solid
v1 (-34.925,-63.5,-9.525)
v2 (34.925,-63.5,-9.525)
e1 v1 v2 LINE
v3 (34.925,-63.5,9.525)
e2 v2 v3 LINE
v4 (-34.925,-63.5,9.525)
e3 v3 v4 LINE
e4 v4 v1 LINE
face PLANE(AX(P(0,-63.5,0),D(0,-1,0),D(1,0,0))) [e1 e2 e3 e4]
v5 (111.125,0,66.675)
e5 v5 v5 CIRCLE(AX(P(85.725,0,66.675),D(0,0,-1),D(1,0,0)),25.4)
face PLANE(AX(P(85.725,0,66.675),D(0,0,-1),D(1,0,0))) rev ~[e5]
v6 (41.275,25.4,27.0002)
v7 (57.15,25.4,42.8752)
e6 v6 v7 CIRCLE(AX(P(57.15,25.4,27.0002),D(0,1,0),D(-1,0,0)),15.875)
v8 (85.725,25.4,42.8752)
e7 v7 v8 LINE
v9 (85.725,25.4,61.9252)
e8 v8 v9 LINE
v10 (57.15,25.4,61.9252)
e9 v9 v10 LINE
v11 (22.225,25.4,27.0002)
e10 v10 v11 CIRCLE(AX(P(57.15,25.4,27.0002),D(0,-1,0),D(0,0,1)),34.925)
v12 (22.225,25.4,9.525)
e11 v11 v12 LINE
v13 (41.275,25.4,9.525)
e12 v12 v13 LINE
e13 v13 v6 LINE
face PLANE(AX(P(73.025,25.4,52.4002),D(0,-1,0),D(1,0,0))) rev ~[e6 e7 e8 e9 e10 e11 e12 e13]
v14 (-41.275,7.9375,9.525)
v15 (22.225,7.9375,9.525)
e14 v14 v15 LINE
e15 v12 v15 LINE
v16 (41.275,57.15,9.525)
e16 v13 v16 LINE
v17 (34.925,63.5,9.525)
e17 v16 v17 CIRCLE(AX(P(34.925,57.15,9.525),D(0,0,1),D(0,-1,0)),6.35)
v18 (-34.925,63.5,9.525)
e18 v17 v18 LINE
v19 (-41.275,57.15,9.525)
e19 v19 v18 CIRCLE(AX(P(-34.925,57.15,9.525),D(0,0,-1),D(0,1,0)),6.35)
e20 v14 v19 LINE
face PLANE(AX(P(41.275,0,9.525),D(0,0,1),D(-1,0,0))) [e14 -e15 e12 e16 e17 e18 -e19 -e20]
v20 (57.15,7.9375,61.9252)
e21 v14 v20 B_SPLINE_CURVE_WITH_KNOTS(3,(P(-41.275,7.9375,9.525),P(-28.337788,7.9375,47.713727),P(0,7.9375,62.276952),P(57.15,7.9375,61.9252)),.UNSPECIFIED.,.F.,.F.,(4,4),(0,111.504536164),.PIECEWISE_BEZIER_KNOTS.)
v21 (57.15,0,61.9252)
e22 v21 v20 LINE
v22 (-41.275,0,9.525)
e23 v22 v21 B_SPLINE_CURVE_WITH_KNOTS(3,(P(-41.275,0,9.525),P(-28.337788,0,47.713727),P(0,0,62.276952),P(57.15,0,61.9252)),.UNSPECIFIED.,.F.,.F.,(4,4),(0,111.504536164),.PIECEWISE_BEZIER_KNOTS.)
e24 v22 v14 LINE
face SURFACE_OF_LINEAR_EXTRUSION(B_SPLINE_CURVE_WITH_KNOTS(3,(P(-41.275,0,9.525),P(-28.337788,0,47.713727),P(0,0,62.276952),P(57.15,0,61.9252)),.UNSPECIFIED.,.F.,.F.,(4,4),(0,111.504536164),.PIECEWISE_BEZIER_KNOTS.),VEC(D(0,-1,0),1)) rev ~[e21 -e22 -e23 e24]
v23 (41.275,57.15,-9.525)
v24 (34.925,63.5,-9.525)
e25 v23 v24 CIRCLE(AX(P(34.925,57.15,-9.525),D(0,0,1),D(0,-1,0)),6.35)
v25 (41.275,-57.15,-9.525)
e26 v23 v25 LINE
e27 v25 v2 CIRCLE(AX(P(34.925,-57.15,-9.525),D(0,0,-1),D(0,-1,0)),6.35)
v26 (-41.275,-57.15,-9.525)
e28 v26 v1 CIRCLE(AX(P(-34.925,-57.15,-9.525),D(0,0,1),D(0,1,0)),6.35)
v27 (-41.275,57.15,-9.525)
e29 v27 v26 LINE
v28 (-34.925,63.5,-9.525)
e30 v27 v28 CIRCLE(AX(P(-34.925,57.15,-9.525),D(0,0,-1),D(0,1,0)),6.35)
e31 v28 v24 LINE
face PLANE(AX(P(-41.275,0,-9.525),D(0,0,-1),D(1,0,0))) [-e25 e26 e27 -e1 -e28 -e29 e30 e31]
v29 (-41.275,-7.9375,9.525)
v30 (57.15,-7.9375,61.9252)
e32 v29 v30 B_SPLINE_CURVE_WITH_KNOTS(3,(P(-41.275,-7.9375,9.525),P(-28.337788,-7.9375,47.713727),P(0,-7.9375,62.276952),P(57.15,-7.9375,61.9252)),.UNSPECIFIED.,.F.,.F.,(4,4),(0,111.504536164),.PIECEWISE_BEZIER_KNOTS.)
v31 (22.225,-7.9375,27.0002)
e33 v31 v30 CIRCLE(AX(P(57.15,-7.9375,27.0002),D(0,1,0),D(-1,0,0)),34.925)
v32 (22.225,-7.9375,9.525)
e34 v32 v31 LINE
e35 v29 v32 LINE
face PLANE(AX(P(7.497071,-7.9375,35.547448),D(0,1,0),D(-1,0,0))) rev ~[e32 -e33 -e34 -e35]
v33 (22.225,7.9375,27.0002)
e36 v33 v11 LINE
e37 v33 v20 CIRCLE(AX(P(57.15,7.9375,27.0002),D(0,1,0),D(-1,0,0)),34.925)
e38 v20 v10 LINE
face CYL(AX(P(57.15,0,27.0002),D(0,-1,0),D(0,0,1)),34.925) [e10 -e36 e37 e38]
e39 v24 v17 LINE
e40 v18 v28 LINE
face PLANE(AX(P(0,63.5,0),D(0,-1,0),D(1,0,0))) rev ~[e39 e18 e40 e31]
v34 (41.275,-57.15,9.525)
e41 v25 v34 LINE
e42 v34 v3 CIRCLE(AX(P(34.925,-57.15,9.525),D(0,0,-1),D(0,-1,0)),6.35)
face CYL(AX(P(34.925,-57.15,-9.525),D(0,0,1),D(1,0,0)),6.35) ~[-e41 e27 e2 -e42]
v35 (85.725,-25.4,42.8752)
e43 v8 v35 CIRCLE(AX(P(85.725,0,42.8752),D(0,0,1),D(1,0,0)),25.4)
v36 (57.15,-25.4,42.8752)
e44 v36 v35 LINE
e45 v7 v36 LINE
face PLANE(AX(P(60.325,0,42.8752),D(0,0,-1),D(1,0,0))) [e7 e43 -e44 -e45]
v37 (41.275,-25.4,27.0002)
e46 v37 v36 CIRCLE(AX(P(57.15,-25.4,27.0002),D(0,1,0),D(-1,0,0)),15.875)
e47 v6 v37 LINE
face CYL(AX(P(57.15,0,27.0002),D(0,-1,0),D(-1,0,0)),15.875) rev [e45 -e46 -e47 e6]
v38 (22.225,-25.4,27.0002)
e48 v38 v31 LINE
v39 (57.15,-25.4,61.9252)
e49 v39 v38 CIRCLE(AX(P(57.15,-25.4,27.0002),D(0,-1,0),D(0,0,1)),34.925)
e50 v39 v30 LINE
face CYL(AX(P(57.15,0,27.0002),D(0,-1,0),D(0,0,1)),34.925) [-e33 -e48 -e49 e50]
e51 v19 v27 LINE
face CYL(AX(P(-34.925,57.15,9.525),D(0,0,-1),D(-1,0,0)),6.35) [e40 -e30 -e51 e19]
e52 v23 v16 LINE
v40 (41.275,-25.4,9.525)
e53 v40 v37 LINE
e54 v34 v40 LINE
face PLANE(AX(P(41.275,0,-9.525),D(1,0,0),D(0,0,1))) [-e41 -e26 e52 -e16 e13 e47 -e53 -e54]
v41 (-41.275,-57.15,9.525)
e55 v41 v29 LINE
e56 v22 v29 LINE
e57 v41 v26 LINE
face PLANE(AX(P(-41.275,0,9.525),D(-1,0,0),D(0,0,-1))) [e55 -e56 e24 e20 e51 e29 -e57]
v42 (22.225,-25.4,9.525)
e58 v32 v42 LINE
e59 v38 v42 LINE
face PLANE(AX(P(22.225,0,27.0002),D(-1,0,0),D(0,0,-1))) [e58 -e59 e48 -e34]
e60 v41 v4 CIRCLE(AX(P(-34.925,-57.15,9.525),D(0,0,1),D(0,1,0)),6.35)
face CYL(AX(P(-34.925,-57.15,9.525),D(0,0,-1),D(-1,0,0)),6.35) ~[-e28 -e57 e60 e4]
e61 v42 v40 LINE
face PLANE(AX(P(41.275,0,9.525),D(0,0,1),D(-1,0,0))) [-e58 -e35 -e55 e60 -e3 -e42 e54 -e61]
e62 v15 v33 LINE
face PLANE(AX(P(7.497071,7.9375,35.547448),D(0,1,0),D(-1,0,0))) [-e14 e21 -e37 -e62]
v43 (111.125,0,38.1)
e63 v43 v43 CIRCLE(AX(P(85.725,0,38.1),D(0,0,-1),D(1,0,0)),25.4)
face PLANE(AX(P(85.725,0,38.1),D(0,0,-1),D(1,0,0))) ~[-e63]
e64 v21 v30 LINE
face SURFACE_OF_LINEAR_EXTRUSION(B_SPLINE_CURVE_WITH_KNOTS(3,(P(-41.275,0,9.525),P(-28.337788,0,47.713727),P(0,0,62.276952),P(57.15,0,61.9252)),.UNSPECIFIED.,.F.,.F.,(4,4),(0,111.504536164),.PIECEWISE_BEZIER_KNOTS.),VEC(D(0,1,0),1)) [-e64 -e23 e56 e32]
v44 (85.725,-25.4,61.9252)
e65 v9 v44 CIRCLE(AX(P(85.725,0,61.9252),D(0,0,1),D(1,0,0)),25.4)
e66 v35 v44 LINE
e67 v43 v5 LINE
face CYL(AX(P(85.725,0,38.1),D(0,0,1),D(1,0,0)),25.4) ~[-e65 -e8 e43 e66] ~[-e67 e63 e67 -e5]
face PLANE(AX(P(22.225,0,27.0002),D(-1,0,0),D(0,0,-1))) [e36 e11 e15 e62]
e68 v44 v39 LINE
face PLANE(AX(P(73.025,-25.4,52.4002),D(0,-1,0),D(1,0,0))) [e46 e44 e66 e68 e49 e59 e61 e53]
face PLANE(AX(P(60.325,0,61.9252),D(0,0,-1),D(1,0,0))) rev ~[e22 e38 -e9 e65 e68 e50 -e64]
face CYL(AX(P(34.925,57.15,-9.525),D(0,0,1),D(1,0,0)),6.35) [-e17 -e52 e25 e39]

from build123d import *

# Parameters (mm, degrees)
F1_DEPTH = 63.5
F2_DEPTH = 25.4
F3_DEPTH = 7.9375
F0_W     = 25.4
F0_H     = 19.05
F4_DEPTH = 25.4
F6_R     = 6.35


# Not quite as in the source:
# - a feature names something its author has since deleted; it is built from what else it names


with BuildPart() as f1:
    # F0 (on Front) → F1 (new body, symmetric)
    with BuildSketch(Plane.XZ):
        Polygon((22.225, 9.525), (-41.275, 9.525), (-41.275, -9.525), (41.275, -9.525), (41.275, 9.525), align=None)
    extrude(amount=F1_DEPTH, both=True)

    # F0 (on Front) → F2 (join, symmetric)
    with BuildSketch(Plane.XZ):
        with BuildLine():
            Line((22.225, 27.0002), (22.225, 9.525))
            Line((22.225, 9.525), (41.275, 9.525))
            Line((41.275, 9.525), (41.275, 27.0002))
            ThreePointArc((41.275, 27.0002), (45.9246798487, 38.2255201513), (57.15, 42.8752))
            Line((57.15, 42.8752), (60.325, 42.8752))
            Line((60.325, 42.8752), (60.325, 61.9252))
            Line((60.325, 61.9252), (57.15, 61.9252))
            ThreePointArc((57.15, 61.9252), (32.4542956671, 51.6959043329), (22.225, 27.0002))
        make_face()
    extrude(amount=F2_DEPTH, both=True)

    # F0 (on Front) → F3 (join, symmetric)
    with BuildSketch(Plane.XZ):
        with BuildLine():
            add(Edge.make_bspline(
                [(-41.275, 9.525), (-28.3377878368, 47.713726759), (0, 62.2769519687), (57.15, 61.9252)],
                knots=[0, 0, 0, 0, 111.5045361635, 111.5045361635, 111.5045361635, 111.5045361635], degree=3))
            Line((-41.275, 9.525), (22.225, 9.525))
            Line((22.225, 9.525), (22.225, 27.0002))
            ThreePointArc((22.225, 27.0002), (32.4542956671, 51.6959043329), (57.15, 61.9252))
        make_face()
    extrude(amount=F3_DEPTH, both=True)

    # F0 (on Front) → F4 (join, symmetric)
    with BuildSketch(Plane.XZ):
        with Locations((73.025, 52.4002)):
            Rectangle(F0_W, F0_H)
    extrude(amount=F4_DEPTH, both=True)

    # F0 (on Front) → F5 (revolve)
    with BuildSketch(Plane.XZ):
        Polygon((85.725, 66.675), (85.725, 61.9252), (85.725, 42.8752), (85.725, 38.1), (111.125, 38.1), (111.125, 66.675), align=None)
    revolve(axis=Axis((85.725, 0, 52.3875), (0, 0, -1)))

    # F6
    f6_edges = [f1.edges().sort_by_distance(p)[0] for p in [
        (-41.275, -63.5, 0),
        (41.275, -63.5, 0),
        (41.275, 63.5, 0),
        (-41.275, 63.5, 0),
    ]]
    fillet(f6_edges, radius=F6_R)


solid = f1.part
